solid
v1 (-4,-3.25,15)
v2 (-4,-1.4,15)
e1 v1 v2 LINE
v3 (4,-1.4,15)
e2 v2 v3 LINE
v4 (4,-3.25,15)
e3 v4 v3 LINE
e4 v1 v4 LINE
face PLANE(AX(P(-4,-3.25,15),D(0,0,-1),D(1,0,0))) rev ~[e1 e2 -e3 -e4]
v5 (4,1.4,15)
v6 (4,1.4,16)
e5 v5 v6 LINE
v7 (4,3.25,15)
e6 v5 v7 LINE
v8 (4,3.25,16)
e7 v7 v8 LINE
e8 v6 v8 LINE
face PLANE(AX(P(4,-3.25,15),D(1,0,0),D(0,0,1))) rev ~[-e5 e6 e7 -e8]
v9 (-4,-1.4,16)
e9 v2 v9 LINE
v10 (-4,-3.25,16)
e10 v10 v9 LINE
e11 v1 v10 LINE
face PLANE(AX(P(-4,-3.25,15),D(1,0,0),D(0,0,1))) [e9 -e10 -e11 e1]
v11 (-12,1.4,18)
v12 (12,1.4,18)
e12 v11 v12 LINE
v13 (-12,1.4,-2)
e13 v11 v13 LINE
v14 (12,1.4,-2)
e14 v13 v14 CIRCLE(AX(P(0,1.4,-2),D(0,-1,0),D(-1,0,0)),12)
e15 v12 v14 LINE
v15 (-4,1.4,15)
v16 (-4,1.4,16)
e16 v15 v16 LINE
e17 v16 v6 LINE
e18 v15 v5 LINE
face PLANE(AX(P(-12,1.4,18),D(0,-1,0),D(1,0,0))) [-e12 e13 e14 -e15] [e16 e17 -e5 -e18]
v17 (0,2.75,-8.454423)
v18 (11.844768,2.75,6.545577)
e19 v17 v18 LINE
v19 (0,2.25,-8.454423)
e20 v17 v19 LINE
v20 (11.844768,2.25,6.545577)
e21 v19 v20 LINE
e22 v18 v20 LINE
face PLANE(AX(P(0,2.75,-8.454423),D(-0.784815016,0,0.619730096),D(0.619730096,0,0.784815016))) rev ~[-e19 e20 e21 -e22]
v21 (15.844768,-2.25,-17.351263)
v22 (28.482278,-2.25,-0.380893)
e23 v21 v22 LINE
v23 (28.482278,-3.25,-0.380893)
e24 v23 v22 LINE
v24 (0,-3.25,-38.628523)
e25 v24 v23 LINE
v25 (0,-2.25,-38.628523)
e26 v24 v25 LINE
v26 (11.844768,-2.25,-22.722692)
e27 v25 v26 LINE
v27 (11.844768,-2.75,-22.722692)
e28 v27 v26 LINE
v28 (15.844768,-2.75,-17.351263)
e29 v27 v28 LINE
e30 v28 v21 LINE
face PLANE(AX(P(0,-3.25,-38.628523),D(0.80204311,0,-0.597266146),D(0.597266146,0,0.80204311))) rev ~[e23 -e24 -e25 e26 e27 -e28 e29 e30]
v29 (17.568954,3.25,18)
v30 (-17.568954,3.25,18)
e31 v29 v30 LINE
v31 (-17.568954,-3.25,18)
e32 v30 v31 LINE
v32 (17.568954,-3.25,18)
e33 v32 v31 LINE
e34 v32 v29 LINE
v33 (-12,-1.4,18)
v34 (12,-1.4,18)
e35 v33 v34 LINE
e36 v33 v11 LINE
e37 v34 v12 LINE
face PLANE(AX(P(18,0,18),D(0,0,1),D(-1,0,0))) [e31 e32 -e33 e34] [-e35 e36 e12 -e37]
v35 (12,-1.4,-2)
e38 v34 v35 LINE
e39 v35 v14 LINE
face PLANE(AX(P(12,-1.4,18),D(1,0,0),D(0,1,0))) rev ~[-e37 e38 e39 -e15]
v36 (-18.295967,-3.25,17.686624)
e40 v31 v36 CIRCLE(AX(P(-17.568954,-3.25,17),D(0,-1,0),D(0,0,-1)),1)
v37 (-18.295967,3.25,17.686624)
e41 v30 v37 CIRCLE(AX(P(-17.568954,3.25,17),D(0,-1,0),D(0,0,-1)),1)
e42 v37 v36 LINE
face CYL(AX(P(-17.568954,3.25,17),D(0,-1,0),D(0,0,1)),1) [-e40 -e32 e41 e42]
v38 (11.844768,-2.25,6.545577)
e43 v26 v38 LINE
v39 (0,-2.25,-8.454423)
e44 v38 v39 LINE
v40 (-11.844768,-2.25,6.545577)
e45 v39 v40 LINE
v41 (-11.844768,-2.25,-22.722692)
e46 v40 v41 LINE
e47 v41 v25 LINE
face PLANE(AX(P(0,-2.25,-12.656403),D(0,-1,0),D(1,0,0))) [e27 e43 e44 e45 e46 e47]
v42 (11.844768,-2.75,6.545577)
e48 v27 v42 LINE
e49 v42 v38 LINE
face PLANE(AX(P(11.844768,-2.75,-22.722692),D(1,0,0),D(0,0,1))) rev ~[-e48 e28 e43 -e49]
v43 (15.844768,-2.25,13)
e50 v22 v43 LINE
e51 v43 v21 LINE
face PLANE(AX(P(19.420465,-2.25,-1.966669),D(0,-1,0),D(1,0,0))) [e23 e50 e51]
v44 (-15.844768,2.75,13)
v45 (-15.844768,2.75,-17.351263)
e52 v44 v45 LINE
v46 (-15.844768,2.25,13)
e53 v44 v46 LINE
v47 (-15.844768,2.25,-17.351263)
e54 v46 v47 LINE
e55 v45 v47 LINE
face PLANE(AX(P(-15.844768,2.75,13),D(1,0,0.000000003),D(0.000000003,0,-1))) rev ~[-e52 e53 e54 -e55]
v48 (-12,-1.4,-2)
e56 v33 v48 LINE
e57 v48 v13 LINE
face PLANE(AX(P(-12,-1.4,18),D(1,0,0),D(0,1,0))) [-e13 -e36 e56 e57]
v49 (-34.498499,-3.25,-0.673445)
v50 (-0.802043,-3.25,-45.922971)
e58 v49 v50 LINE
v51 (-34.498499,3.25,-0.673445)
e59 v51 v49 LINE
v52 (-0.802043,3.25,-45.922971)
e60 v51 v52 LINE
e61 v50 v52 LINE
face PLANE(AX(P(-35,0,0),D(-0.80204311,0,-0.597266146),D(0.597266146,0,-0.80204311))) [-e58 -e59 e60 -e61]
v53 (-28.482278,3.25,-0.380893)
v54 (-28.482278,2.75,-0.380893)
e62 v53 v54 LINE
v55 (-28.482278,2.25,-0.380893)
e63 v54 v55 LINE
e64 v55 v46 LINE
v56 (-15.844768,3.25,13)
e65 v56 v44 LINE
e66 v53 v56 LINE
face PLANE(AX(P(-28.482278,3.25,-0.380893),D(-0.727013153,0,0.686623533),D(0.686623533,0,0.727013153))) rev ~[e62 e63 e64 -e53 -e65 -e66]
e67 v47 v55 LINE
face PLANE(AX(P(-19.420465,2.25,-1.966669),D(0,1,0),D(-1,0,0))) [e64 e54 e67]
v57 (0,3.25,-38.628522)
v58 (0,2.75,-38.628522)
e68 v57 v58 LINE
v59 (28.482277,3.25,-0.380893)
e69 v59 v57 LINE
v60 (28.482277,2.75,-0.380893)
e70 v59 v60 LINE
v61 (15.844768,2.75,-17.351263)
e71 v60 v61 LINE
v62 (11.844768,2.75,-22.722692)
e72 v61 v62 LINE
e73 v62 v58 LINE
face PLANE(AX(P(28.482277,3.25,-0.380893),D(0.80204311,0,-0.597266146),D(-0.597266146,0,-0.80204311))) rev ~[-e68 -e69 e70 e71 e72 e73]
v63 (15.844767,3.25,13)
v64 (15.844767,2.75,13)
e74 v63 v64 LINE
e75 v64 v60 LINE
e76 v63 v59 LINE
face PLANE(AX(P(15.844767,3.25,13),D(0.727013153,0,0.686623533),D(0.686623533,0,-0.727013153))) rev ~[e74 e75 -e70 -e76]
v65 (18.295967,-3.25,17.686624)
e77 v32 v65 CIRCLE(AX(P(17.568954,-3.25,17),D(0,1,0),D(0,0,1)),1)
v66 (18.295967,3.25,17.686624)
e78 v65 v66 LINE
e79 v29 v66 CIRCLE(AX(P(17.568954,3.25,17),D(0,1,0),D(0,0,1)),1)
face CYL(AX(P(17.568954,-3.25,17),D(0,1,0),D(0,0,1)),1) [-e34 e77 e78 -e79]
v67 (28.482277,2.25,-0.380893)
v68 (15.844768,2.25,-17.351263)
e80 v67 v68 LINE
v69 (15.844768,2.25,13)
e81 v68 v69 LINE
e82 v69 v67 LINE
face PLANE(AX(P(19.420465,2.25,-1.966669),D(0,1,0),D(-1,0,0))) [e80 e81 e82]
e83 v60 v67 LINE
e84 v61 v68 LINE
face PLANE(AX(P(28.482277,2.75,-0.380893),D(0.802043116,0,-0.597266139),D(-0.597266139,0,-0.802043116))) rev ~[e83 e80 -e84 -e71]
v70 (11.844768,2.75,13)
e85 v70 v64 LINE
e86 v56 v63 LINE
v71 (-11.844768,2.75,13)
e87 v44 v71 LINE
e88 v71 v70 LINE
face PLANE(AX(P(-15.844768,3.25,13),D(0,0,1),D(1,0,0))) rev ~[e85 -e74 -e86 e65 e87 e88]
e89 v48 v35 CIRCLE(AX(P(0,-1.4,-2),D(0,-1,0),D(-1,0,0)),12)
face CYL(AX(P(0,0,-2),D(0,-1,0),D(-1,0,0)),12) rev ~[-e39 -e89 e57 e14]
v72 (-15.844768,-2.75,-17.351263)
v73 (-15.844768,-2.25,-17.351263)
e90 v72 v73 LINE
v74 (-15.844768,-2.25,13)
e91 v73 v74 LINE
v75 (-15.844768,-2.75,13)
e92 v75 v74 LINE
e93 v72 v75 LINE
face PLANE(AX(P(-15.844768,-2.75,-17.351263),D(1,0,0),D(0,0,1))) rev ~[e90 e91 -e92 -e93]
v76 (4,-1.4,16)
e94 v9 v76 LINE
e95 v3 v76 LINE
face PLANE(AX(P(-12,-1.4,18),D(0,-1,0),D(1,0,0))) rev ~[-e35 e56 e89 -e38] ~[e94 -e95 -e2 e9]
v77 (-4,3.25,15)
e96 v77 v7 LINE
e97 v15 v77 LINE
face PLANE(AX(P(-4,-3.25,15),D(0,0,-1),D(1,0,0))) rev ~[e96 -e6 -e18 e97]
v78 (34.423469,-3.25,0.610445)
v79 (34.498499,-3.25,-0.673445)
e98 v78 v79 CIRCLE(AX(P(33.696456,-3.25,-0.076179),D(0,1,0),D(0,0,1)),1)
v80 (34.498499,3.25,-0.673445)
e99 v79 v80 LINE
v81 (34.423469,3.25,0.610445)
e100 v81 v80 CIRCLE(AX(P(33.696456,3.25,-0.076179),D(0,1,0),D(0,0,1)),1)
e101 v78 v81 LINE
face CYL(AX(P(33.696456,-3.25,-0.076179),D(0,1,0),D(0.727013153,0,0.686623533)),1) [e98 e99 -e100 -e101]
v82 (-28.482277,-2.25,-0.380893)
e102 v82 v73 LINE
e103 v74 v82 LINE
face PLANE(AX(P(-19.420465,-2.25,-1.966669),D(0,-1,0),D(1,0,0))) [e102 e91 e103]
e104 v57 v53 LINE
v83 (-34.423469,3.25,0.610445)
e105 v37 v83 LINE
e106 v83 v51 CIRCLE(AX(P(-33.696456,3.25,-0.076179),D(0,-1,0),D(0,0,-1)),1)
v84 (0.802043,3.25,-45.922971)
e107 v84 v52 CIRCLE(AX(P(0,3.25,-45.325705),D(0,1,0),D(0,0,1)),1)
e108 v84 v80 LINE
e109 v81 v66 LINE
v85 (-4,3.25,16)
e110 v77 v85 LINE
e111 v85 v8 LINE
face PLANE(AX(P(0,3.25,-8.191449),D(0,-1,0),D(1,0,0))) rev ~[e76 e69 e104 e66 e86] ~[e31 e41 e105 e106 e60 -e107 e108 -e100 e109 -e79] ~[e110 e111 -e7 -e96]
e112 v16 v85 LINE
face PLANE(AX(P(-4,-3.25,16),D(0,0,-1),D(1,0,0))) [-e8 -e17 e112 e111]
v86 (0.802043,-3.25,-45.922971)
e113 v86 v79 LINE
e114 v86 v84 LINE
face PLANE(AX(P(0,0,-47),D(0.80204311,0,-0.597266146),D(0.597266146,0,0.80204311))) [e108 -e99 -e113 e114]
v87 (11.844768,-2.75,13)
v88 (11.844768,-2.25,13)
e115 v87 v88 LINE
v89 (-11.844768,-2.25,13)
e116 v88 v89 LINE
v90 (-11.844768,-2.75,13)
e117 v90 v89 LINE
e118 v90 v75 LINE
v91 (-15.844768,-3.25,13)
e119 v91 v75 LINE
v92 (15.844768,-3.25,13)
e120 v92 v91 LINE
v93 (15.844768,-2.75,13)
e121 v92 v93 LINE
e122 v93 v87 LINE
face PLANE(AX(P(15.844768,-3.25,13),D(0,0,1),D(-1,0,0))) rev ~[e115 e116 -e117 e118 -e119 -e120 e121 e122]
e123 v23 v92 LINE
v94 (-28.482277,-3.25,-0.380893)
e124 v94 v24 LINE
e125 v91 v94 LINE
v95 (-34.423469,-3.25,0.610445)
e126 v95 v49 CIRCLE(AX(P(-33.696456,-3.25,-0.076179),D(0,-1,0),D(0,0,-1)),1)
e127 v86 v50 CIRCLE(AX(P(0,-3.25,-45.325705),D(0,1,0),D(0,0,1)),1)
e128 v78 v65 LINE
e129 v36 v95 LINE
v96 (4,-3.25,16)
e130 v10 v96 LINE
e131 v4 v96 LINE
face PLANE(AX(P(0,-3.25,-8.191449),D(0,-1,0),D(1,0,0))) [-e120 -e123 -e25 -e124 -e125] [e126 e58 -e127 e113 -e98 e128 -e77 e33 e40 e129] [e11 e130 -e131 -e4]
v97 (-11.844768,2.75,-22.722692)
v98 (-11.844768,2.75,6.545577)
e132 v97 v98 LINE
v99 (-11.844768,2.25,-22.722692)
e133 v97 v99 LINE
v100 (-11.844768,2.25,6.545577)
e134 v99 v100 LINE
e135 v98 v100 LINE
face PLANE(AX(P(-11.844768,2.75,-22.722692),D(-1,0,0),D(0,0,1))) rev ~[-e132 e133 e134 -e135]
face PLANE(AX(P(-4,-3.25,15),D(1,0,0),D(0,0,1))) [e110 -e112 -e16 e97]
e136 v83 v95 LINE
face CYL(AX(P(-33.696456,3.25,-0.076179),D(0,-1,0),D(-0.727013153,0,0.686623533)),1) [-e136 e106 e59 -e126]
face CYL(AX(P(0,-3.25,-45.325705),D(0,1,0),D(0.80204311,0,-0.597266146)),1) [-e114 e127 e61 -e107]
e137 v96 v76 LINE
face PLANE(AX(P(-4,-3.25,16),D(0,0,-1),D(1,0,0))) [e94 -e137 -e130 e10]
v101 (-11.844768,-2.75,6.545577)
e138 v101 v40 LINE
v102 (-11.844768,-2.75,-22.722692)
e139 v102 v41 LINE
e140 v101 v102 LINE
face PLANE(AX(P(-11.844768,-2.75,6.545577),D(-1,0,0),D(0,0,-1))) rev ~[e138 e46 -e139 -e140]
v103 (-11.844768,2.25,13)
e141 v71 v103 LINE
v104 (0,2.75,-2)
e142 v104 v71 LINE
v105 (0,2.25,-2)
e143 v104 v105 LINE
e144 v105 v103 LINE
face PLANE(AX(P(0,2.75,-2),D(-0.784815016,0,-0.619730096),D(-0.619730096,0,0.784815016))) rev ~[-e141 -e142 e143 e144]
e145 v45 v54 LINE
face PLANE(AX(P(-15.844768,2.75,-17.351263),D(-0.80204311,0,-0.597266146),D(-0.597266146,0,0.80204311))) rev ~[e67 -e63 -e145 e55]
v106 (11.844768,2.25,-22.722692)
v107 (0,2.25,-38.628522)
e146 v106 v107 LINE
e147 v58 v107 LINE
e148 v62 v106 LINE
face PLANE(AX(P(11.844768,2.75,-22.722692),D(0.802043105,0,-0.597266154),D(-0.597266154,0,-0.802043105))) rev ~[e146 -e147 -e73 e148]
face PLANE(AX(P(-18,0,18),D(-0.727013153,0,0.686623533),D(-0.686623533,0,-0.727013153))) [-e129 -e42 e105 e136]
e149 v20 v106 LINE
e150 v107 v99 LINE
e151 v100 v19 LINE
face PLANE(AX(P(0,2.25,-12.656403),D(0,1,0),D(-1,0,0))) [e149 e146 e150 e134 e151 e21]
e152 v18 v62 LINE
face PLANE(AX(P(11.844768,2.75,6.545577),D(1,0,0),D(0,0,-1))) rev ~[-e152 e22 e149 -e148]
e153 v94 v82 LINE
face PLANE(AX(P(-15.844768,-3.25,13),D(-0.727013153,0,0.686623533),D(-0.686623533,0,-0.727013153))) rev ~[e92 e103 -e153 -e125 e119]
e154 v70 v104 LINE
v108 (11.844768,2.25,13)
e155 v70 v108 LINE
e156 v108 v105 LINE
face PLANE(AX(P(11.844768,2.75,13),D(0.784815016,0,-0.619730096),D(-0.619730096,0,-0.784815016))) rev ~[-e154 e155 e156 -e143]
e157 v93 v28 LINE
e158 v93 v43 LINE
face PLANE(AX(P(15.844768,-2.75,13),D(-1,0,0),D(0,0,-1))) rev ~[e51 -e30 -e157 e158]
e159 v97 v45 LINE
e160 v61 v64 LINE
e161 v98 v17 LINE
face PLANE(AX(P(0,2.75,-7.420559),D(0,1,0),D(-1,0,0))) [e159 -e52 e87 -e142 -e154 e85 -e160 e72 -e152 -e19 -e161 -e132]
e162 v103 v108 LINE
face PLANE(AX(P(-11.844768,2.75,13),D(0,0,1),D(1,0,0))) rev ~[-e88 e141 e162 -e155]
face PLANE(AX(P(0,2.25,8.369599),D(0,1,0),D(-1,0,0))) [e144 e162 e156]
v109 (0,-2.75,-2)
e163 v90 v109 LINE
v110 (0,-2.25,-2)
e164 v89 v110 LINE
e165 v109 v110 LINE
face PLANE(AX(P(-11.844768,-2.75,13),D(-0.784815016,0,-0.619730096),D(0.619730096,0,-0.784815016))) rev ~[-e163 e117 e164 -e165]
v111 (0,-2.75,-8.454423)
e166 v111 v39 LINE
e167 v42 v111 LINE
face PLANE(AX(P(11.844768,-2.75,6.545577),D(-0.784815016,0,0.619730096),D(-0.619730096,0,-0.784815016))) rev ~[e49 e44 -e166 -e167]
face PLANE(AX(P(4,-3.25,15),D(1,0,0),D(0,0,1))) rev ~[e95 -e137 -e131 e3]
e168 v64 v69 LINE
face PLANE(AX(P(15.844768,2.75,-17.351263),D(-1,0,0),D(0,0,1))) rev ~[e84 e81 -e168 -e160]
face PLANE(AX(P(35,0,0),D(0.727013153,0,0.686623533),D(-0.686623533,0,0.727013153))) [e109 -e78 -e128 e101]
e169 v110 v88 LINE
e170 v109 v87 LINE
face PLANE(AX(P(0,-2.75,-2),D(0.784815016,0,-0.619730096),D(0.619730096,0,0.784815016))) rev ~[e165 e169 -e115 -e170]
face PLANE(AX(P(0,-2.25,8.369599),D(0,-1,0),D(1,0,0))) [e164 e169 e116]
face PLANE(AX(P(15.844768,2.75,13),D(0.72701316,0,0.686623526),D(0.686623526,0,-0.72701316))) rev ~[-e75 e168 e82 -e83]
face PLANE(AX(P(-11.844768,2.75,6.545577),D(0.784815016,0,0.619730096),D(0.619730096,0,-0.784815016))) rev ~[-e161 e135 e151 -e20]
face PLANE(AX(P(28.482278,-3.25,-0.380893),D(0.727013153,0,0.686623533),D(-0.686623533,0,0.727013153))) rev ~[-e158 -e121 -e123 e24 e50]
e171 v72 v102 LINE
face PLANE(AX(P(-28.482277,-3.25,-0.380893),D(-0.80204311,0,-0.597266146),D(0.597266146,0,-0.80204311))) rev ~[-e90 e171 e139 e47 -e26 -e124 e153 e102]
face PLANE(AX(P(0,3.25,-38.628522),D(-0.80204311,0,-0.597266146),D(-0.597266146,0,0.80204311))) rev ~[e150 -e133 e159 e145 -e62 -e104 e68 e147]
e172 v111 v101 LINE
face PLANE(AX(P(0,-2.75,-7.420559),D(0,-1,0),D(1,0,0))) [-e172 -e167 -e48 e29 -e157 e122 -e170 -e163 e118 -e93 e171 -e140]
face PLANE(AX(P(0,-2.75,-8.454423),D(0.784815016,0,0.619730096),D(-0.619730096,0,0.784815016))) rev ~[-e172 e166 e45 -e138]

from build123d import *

# Parameters (mm, degrees)
F1_DEPTH  = 3.25
F3_DEPTH  = 0.5
F5_DEPTH  = 0.5
F7_DEPTH  = 0.5
F9_DEPTH  = 0.5
F10_W     = 24
F10_H     = 2.8
F11_DEPTH = 20
F13_DEPTH = 1.4
F14_W     = 8
F14_H     = 1
F15_DEPTH = 25
F16_R     = 1


# Not quite as in the source:
# - ends of sketch curves that miss each other by under 0.0002 mm in the source are joined


with BuildPart() as f1:
    # F0 (on Front) → F1 (new body, symmetric)
    with BuildSketch(Plane.XZ):
        Polygon((18, 18), (0, 18), (-18, 18), (-35, 0), (0, -47), (35, 0), align=None)
    extrude(amount=F1_DEPTH, both=True)

    # F2 (on face) → F3 (cut)
    with BuildSketch(Plane.XZ.offset(3.25)):
        Polygon((15.8447675538, 13), (-15.8447675538, 13), (-28.4822773709, -0.3808927475), (1.162e-07, -38.628522516), (28.4822775009, -0.3808928851), align=None)
    extrude(amount=-F3_DEPTH, mode=Mode.SUBTRACT)

    # F4 (on face) → F5 (cut)
    with BuildSketch(Plane(origin=(0, 3.25, 0), x_dir=(-1, 0, 0), z_dir=(0, 1, 0))):
        Polygon((28.482277527, -0.3808925379), (15.8447676545, 13.0000002682), (-15.8447670441, 13.0000002682), (-28.4822772579, -0.3808928993), (0, -38.6285223599), align=None)
    extrude(amount=-F5_DEPTH, mode=Mode.SUBTRACT)

    # F6 (on face) → F7 (cut)
    with BuildSketch(Plane.XZ.offset(2.75)):
        Polygon((-15.8447675538, -17.3512630734), (-15.8447675538, 13), (-28.4822773709, -0.3808927475), align=None)
        Polygon((28.4822775009, -0.3808928851), (15.8447675538, 13), (15.8447675538, -17.3512633855), align=None)
        Polygon((0, -8.4544227059), (-11.8447675538, 6.5455772941), (-11.8447675538, -22.7226916448), (1.162e-07, -38.628522516), (11.8447675538, -22.7226919569), (11.8447675538, 6.5455772941), align=None)
        Polygon((11.8447675538, 13), (-11.8447675538, 13), (0, -2), align=None)
    extrude(amount=-F7_DEPTH, mode=Mode.SUBTRACT)

    # F8 (on face) → F9 (cut)
    with BuildSketch(Plane(origin=(0, 2.75, 0), x_dir=(-1, 0, 0), z_dir=(0, 1, 0))):
        Polygon((-15.8447675538, -17.3512633855), (-15.8447675538, 13), (-28.4822772579, -0.3808928993), align=None)
        Polygon((0, -8.4544227059), (-11.8447675538, 6.5455772941), (-11.8447675538, -22.7226919569), (0, -38.6285223599), (11.8447675538, -22.7226916448), (11.8447675538, 6.5455772941), align=None)
        Polygon((-11.8447675538, 13), (0, -2), (11.8447675538, 13), align=None)
        Polygon((28.482277527, -0.3808925379), (15.8447676545, 13.0000002682), (15.8447675538, -17.3512630734), align=None)
    extrude(amount=-F9_DEPTH, mode=Mode.SUBTRACT)

    # F10 (on face) → F11 (cut)
    with BuildSketch(Plane.XY.offset(18)):
        Rectangle(F10_W, F10_H)
    extrude(amount=-F11_DEPTH, mode=Mode.SUBTRACT)

    # F12 (on Front) → F13 (cut, symmetric)
    with BuildSketch(Plane.XZ):
        with BuildLine():
            Line((12, -2), (-12, -2))
            ThreePointArc((-12, -2), (0, -14), (12, -2))
        make_face()
    extrude(amount=F13_DEPTH, both=True, mode=Mode.SUBTRACT)

    # F14 (on face) → F15 (cut)
    with BuildSketch(Plane.XZ.offset(3.25)):
        with Locations((0, 15.5)):
            Rectangle(F14_W, F14_H)
    extrude(amount=-F15_DEPTH, mode=Mode.SUBTRACT)

    # F16
    f16_edges = [f1.edges().sort_by_distance(p)[0] for p in [
        (0, 0, -47),
        (35, 0, 0),
        (-35, 0, 0),
        (-18, 0, 18),
        (18, 0, 18),
    ]]
    fillet(f16_edges, radius=F16_R)


solid = f1.part
